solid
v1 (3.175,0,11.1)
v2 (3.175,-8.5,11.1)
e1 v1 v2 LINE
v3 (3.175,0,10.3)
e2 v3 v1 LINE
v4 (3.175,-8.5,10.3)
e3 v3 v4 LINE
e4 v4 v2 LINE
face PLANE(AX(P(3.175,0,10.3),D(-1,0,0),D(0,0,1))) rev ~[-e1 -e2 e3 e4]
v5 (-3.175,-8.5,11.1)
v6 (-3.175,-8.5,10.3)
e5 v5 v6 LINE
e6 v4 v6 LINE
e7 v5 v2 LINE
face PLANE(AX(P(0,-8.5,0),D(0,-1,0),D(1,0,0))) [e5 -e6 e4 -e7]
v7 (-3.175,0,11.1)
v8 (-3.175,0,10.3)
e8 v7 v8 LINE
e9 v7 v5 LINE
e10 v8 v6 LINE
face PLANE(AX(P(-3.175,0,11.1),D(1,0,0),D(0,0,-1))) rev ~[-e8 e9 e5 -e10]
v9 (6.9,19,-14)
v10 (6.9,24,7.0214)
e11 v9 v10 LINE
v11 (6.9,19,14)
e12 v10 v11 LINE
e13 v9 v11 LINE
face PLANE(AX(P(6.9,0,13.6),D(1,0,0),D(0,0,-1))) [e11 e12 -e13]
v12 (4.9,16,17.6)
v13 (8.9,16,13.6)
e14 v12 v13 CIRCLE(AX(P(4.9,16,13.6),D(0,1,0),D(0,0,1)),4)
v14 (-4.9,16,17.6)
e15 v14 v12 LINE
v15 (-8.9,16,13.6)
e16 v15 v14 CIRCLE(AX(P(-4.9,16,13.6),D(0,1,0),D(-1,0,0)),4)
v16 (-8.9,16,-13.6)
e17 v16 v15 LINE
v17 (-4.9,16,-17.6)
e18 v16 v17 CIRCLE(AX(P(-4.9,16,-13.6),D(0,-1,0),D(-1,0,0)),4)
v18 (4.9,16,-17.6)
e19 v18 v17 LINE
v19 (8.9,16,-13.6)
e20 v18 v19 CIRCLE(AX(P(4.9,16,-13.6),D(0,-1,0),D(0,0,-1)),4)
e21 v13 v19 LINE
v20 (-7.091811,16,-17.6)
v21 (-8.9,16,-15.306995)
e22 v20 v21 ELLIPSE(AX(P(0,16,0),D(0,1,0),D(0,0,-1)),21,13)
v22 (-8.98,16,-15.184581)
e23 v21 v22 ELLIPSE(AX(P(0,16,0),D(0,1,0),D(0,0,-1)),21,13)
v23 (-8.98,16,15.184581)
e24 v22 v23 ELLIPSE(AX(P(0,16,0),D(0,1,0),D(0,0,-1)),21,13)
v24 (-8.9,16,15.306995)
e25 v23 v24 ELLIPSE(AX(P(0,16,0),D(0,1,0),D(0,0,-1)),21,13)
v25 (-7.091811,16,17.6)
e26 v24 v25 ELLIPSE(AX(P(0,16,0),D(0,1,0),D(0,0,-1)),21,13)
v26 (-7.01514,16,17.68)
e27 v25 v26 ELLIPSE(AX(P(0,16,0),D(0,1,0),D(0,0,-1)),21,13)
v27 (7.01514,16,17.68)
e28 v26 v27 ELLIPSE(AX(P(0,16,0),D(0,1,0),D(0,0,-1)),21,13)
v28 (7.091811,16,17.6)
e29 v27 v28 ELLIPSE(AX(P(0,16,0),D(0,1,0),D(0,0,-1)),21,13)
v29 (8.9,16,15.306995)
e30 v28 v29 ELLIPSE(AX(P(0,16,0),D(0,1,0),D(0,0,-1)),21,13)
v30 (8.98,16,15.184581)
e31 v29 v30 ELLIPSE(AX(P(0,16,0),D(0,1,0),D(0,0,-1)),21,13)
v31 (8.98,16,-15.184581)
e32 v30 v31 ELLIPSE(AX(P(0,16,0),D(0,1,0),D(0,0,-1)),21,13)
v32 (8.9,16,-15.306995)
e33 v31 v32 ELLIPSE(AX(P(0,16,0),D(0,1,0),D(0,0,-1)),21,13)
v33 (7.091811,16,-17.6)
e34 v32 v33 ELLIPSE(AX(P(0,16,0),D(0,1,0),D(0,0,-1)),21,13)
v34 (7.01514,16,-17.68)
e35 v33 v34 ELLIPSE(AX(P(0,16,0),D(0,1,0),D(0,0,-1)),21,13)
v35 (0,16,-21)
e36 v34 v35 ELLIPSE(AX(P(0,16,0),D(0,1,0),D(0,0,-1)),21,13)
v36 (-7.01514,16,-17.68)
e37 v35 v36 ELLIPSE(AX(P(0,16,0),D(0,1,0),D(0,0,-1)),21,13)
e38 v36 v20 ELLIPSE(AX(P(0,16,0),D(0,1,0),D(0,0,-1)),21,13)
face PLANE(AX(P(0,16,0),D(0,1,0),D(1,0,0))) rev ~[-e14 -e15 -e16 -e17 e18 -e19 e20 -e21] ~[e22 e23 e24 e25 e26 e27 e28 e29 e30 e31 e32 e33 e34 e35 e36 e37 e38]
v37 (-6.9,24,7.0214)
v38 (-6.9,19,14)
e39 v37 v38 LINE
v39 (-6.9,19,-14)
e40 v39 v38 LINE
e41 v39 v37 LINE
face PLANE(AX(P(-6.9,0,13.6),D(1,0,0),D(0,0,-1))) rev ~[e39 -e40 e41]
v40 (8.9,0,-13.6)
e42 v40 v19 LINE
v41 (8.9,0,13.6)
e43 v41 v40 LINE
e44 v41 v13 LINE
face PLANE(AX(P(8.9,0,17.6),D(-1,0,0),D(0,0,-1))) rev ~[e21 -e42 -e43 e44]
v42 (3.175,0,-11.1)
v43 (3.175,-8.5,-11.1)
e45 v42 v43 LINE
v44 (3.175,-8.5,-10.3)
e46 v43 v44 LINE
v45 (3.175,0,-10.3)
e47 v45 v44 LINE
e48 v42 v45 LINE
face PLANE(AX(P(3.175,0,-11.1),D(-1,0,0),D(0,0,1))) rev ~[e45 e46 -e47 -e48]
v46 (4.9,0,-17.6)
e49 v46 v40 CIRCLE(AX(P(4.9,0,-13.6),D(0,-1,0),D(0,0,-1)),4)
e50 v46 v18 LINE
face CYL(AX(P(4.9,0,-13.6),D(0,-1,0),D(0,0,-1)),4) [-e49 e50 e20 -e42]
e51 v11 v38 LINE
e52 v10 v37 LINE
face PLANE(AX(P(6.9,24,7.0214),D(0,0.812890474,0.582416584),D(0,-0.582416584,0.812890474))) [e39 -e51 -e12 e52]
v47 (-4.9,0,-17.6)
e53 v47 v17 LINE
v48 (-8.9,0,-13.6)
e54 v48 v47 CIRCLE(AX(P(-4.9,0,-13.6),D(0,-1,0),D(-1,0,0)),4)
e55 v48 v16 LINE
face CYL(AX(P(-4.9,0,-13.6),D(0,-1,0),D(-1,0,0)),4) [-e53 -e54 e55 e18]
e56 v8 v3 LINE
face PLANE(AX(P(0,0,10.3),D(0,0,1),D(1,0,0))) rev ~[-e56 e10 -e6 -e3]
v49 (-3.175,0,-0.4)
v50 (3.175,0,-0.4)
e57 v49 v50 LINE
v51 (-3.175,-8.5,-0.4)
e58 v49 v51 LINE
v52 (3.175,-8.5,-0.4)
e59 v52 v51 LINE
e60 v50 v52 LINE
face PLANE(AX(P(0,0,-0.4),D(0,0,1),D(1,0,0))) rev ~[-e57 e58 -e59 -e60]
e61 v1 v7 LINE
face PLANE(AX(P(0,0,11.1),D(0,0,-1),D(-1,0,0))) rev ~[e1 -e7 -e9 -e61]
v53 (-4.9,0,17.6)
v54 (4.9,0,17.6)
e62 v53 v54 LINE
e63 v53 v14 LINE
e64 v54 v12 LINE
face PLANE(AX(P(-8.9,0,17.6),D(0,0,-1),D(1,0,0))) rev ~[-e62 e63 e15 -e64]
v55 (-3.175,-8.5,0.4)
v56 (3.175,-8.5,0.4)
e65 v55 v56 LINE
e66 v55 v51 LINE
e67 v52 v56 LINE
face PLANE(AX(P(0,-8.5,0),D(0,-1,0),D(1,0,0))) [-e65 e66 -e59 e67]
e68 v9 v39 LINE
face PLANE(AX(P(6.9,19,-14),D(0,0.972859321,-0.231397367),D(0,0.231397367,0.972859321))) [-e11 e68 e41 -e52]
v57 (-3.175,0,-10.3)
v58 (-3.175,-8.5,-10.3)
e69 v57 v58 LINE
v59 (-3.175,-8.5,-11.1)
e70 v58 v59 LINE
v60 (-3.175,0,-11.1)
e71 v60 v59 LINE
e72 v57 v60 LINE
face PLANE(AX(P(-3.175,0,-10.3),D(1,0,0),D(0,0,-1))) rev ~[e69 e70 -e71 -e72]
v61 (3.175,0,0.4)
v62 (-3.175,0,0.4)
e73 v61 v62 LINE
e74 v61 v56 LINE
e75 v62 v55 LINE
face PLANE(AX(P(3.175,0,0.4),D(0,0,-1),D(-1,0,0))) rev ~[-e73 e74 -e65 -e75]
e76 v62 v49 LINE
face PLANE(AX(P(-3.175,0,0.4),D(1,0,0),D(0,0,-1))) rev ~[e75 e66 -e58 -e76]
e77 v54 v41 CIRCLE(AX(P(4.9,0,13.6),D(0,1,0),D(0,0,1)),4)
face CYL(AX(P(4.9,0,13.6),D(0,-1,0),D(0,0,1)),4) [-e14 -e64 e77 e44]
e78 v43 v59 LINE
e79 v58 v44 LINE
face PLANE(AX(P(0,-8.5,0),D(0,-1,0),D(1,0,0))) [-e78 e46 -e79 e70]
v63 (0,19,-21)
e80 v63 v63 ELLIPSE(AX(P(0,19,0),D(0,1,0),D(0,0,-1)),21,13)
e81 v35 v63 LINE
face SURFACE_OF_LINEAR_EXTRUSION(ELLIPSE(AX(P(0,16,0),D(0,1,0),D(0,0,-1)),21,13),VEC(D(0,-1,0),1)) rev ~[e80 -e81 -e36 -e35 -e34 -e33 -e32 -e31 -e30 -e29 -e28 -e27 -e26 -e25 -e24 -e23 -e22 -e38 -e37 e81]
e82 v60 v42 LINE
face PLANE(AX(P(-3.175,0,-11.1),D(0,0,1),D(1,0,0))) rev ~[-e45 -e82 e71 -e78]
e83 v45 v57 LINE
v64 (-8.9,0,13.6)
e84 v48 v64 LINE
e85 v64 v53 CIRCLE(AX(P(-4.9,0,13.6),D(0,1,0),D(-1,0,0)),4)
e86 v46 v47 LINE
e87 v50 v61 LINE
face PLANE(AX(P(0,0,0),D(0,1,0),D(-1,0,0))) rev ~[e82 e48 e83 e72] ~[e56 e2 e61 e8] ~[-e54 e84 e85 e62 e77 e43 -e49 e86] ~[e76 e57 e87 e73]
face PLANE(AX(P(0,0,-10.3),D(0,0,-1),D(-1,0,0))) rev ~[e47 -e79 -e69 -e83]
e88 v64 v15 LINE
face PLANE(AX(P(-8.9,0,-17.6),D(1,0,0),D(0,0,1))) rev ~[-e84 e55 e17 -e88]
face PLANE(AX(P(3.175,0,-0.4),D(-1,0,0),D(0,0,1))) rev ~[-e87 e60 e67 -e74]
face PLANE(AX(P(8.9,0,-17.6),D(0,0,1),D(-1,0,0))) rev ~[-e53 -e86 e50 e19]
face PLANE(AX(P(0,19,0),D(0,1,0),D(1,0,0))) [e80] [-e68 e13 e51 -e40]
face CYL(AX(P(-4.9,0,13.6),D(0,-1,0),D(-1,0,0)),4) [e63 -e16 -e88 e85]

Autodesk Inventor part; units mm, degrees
ref_plane "YZ Plane" through (0, 0, 0) normal (1, 0, 0) x (0, 1, 0)
ref_plane "XZ Plane" through (0, 0, 0) normal (0, 1, 0) x (-1, 0, 0)
sketch "Sketch1" plane through (0, 0, 0) normal (0, 1, 0) x (-1, 0, 0)
  line L0 (8.9, 17.6) -> (-8.9, 17.6)
  line L1 (-8.9, 17.6) -> (-8.9, -17.6)
  line L2 (-8.9, -17.6) -> (8.9, -17.6)
  line L3 (8.9, -17.6) -> (8.9, 17.6)
  point P0 (0, 0)
  point P1 (8.9, 0)
  point P2 (0, -17.6)
  dimension "d0" = 35.2
  dimension "d1" = 17.8
extrude "Extrusion1" add sketch "Sketch1" along normal blind 16
sketch "Sketch2" plane through (0, 16, 0) normal (0, 1, 0) x (1, 0, 0)
  ellipse E0 centre (0, 0) end of major axis (0, 21) minor radius 13
  dimension "d4" = 21
  dimension "d5" = 13
extrude "Extrusion2" add sketch "Sketch2" along normal blind 3
fillet "Fillet1" radius 4 4 edges at (8.9, 8, 17.6) (8.9, 8, -17.6) (-8.9, 8, 17.6) (-8.9, 8, -17.6)
ref_plane "Work Plane1" through (6.9, 0, 13.6) normal (1, 0, 0) x (0, 0, -1)
sketch "Sketch3" plane through (6.9, 0, 13.6) normal (1, 0, 0) x (0, 0, -1)
  line L0 (34.6, 19) -> (-7.4, 19) projected
  line L1 (27.6, 19) -> (6.5786, 24)
  line L2 (6.5786, 24) -> (-0.4, 19)
  line L3 (-0.4, 19) -> (27.6, 19)
  point P0 (13.6, 0)
  dimension "d10" = 7
  dimension "d11" = 7
  dimension "d12" = 5
  dimension "d13" = 131
extrude "Extrusion3" add sketch "Sketch3" against normal blind 13.8
sketch "Sketch4" plane through (0, 0, 0) normal (0, -1, 0) x (1, 0, 0)
  line L0 (3.175, 11.1) -> (-3.175, 11.1)
  line L1 (-3.175, 11.1) -> (-3.175, 10.3)
  line L2 (-3.175, 10.3) -> (3.175, 10.3)
  line L3 (3.175, 10.3) -> (3.175, 11.1)
  line L4 (3.175, 0.4) -> (-3.175, 0.4)
  line L5 (-3.175, 0.4) -> (-3.175, -0.4)
  line L6 (-3.175, -0.4) -> (3.175, -0.4)
  line L7 (3.175, -0.4) -> (3.175, 0.4)
  line L8 (3.175, -10.3) -> (-3.175, -10.3)
  line L9 (-3.175, -10.3) -> (-3.175, -11.1)
  line L10 (-3.175, -11.1) -> (3.175, -11.1)
  line L11 (3.175, -11.1) -> (3.175, -10.3)
  line L12 (0, 10.3) -> (0, 0.4)
  line L13 (0, -0.4) -> (0, -10.3)
  line L14 (0, -11.1) -> (0, -21)
  ellipse E0 centre (0, 0) end of major axis (0, 21) minor radius 13 projected
  line L15 (0, 11.1) -> (0, 21)
  point P0 (3.175, 0)
  dimension "d16" = 0.8
  dimension "d17" = 6.35
extrude "Extrusion4" add sketch "Sketch4" along normal blind 8.5 contours L3 L2 L1 L0 | L4 L7 L6 L5 | L10 L9 L8 L11
properties part number "SwitchRocker"
